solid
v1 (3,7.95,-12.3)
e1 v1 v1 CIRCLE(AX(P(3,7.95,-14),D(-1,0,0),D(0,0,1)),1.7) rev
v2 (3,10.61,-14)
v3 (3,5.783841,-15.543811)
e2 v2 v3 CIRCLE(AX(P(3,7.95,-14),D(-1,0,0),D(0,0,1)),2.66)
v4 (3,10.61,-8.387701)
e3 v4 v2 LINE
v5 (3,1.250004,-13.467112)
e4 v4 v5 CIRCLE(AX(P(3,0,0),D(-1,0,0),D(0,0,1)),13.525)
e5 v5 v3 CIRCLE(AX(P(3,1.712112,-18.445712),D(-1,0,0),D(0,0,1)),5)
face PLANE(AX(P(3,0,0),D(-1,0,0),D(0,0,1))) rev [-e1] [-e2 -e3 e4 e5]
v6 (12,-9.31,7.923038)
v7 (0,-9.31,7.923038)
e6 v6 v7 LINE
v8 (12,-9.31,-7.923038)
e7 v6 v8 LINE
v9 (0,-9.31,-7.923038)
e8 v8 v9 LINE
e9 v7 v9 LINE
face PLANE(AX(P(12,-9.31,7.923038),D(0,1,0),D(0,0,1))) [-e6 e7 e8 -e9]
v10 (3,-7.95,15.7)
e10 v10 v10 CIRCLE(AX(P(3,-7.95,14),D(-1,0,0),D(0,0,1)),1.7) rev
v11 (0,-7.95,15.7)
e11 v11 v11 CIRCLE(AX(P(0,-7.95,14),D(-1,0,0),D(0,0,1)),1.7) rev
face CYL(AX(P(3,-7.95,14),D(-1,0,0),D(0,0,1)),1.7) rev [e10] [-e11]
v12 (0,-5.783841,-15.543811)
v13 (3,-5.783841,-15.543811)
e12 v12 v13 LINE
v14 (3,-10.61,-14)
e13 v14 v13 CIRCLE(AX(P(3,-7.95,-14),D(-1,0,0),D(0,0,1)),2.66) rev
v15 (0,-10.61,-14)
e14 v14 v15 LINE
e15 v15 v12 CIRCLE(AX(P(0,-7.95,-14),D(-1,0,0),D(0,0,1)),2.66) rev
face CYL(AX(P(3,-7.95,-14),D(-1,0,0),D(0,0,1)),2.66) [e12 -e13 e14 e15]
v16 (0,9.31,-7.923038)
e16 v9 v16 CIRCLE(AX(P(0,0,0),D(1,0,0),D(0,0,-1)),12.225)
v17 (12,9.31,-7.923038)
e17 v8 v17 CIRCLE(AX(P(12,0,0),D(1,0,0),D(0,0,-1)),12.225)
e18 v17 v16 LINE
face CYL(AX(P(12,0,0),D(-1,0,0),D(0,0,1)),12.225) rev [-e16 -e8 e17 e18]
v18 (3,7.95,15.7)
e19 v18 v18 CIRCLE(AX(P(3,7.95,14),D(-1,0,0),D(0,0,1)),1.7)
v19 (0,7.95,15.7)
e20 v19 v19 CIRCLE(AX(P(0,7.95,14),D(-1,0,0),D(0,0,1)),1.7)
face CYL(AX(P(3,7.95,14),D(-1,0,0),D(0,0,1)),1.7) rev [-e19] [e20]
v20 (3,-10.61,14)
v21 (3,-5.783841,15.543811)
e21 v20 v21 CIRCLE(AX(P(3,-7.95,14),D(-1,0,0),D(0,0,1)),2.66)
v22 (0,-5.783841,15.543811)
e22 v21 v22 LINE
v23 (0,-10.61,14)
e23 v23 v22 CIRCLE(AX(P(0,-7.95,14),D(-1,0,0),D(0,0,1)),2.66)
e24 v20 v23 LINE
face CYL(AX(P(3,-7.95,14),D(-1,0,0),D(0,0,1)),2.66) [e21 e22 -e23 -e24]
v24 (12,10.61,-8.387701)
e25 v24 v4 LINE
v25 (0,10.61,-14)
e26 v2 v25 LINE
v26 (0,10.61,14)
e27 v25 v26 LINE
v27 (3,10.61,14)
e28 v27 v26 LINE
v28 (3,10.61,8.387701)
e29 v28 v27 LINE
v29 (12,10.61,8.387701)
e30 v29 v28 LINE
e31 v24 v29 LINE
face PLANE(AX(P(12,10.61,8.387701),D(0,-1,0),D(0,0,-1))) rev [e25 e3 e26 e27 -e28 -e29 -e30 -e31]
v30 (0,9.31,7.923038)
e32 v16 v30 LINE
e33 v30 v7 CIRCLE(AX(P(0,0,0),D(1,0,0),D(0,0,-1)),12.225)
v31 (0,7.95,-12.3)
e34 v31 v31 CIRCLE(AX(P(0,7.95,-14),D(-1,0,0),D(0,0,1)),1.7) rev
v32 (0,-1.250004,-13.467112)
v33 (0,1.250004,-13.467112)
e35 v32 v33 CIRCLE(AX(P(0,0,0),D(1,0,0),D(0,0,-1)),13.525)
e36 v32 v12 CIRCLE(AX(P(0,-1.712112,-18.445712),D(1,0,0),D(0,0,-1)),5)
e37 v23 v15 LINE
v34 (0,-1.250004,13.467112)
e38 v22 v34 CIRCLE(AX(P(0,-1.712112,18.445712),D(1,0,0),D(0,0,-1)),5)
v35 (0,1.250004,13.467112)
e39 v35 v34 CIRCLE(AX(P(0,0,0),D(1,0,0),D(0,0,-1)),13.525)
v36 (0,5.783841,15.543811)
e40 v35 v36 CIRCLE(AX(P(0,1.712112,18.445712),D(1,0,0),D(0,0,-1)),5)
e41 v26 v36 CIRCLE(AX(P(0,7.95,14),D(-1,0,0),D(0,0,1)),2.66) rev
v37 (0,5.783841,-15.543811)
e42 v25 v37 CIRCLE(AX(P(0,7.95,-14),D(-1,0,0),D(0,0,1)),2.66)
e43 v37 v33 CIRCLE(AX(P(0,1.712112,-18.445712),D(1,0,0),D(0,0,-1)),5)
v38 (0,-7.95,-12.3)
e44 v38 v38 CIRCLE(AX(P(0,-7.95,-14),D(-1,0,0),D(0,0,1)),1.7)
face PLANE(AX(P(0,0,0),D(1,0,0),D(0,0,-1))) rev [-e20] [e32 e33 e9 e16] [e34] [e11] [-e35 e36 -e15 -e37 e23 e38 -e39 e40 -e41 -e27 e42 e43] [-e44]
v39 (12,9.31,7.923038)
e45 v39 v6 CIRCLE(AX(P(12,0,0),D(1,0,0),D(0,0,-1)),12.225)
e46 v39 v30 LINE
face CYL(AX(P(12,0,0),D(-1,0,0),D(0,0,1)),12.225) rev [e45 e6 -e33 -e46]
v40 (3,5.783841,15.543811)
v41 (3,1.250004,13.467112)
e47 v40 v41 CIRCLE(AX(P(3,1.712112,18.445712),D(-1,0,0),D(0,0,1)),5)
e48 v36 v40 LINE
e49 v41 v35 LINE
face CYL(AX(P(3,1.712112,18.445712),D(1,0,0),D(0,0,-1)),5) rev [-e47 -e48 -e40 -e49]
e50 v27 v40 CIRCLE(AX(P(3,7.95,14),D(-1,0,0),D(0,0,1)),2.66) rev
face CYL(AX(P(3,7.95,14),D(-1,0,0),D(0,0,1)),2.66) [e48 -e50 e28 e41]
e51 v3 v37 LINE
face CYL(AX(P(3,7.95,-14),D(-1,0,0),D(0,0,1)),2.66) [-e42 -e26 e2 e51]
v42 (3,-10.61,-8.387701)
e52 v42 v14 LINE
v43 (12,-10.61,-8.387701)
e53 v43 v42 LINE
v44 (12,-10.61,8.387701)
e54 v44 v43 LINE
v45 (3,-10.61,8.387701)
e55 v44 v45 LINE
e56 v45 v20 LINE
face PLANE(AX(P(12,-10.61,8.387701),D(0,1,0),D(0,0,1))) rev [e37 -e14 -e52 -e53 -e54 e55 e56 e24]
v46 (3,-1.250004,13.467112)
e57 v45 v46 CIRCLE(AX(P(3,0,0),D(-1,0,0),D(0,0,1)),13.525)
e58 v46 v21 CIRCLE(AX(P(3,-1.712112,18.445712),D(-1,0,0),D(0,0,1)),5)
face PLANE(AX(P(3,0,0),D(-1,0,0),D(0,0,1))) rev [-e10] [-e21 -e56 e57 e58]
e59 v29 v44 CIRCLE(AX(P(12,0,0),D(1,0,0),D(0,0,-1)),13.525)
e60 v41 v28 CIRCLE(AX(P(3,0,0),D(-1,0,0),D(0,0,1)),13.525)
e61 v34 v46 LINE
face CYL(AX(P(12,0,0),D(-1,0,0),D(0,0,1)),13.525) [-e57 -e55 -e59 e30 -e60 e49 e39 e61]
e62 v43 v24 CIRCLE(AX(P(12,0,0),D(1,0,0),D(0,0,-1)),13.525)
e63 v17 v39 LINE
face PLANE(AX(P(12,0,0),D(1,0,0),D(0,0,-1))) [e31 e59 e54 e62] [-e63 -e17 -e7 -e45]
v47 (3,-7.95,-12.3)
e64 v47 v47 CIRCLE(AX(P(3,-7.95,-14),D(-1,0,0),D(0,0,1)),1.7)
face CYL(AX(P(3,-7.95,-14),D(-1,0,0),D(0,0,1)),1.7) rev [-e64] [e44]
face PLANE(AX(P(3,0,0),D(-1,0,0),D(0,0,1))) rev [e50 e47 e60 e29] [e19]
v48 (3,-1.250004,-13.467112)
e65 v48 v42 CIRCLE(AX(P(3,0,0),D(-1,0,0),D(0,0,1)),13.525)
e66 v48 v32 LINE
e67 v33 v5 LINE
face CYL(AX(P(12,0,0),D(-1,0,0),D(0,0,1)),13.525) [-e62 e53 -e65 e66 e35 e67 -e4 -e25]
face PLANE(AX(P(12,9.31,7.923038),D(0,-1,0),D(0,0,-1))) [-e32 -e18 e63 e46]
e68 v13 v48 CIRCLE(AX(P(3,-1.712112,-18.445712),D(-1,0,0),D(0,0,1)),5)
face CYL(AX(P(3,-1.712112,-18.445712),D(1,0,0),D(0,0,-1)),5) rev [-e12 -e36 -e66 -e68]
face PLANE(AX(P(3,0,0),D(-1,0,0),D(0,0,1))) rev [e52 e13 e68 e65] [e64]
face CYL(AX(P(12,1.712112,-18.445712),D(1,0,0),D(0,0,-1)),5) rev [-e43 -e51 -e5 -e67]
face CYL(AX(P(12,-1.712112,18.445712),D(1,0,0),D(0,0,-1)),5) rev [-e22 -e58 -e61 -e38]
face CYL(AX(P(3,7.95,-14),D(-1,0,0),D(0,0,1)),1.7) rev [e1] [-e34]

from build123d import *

# Parameters (mm, degrees)
MOTOR_HOLDER_DEPTH  = 12
SKETCH2_R           = 1.7
BOSS_EXTRUDE1_DEPTH = 3
FILLET1_R           = 5


with BuildPart() as part:
    # Sketch1 → Motor Holder (new body)
    with BuildSketch(Plane(origin=(0, 0, 0), x_dir=(0, 0, -1), z_dir=(1, 0, 0))):
        with BuildLine():
            Line((-8.387700817, 10.61), (8.387700817, 10.61))
            ThreePointArc((8.387700817, 10.61), (13.525, 0), (8.387700817, -10.61))
            Line((8.387700817, -10.61), (-8.387700817, -10.61))
            ThreePointArc((-8.387700817, -10.61), (-13.525, 0), (-8.387700817, 10.61))
        make_face()
        with BuildLine():
            Line((-7.923037612, 9.31), (7.923037612, 9.31))
            ThreePointArc((7.923037612, 9.31), (12.225, 0), (7.923037612, -9.31))
            Line((7.923037612, -9.31), (-7.923037612, -9.31))
            ThreePointArc((-7.923037612, -9.31), (-12.225, 0), (-7.923037612, 9.31))
        make_face(mode=Mode.SUBTRACT)
    extrude(amount=MOTOR_HOLDER_DEPTH)

    # Sketch2 → Boss-Extrude1 (add)
    # profile 1 of 4: a face of its own
    with BuildSketch(Plane.ZY):
        with BuildLine():
            Line((-14.913279506, 5.451696467), (-12.702840333, 4.643648617))
            ThreePointArc((-12.702840333, 4.643648617), (-10.959108938, 7.926131231), (-8.387700817, 10.61))
            Line((-8.387700817, 10.61), (-14, 10.61))
            ThreePointArc((-14, 10.61), (-16.619263961, 8.413741632), (-14.913279506, 5.451696467))
        make_face()
        with Locations((-14, 7.95)):
            Circle(SKETCH2_R, mode=Mode.SUBTRACT)
    # profile 2 of 4: a face of its own
    with BuildSketch(Plane.ZY):
        with BuildLine():
            Line((-14, -10.61), (-8.387700817, -10.61))
            ThreePointArc((-8.387700817, -10.61), (-10.959108938, -7.926131231), (-12.702840333, -4.643648617))
            Line((-12.702840333, -4.643648617), (-14.913279506, -5.451696467))
            ThreePointArc((-14.913279506, -5.451696467), (-16.619263961, -8.413741632), (-14, -10.61))
        make_face()
        with Locations((-14, -7.95)):
            Circle(SKETCH2_R, mode=Mode.SUBTRACT)
    # profile 3 of 4: a face of its own
    with BuildSketch(Plane.ZY):
        with BuildLine():
            Line((14.913279506, -5.451696467), (12.702840333, -4.643648617))
            ThreePointArc((12.702840333, -4.643648617), (10.959108938, -7.926131231), (8.387700817, -10.61))
            Line((8.387700817, -10.61), (14, -10.61))
            ThreePointArc((14, -10.61), (16.619263961, -8.413741632), (14.913279506, -5.451696467))
        make_face()
        with Locations((14, -7.95)):
            Circle(SKETCH2_R, mode=Mode.SUBTRACT)
    # profile 4 of 4: a face of its own
    with BuildSketch(Plane.ZY):
        with BuildLine():
            Line((14, 10.61), (8.387700817, 10.61))
            ThreePointArc((8.387700817, 10.61), (10.959108938, 7.926131231), (12.702840333, 4.643648617))
            Line((12.702840333, 4.643648617), (14.913279506, 5.451696467))
            ThreePointArc((14.913279506, 5.451696467), (16.619263961, 8.413741632), (14, 10.61))
        make_face()
        with Locations((14, 7.95)):
            Circle(SKETCH2_R, mode=Mode.SUBTRACT)
    extrude(amount=-BOSS_EXTRUDE1_DEPTH)

    # Fillet1
    # the kernel refuses this fillet: 5 mm, written as the material it adds along each edge
    with BuildSketch(Plane(origin=(0, -4.643648617, -12.702840333), x_dir=(0, -0.37246154251752206, -0.9280476277354887), z_dir=(1, 0, 0)), Plane(origin=(0, 4.643648617, 12.702840333), x_dir=(0, 0.3724615425175231, 0.9280476277354882), z_dir=(1, 0, 0))) as fillet1_piece_1:
        with BuildLine():
            CenterArc((4.237774009, 4.85960426), FILLET1_R, 196.564565372, 59.825655305)
            Line((-0.554721368, 3.434126074), (-1.033970906, 3.291578255))
            ThreePointArc((-1.033970906, 3.291578255), (-0.660094703, 1.655239232), (-0.499756797, -0.015593065))
            Line((-0.499756797, -0.015593065), (0.015593065, -0.499756797))
            ThreePointArc((0.015593065, -0.499756797), (2.367952645, -0.426360103), (2.94357998, -0.485960426))
            Line((2.94357998, -0.485960426), (3.061233982, 0))
        make_face()
    extrude(amount=3)
    with BuildSketch(Plane(origin=(0, 4.643648617, -12.702840333), x_dir=(0, 0.3724615425175213, -0.9280476277354889), z_dir=(1, 0, 0)), Plane(origin=(0, -4.643648617, 12.702840333), x_dir=(0, -0.37246154251752195, 0.9280476277354888), z_dir=(1, 0, 0))) as fillet1_piece_2:
        with BuildLine():
            CenterArc((4.237774009, -4.85960426), FILLET1_R, 103.609779323, 59.825655305)
            Line((-0.554721368, -3.434126074), (-1.033970906, -3.291578255))
            ThreePointArc((-1.033970906, -3.291578255), (-0.660094703, -1.655239232), (-0.499756797, 0.015593065))
            Line((-0.499756797, 0.015593065), (0.015593065, 0.499756797))
            ThreePointArc((0.015593065, 0.499756797), (2.367952645, 0.426360103), (2.94357998, 0.485960426))
            Line((2.94357998, 0.485960426), (3.061233982, 0))
        make_face()
    extrude(amount=3)


solid = part.part
